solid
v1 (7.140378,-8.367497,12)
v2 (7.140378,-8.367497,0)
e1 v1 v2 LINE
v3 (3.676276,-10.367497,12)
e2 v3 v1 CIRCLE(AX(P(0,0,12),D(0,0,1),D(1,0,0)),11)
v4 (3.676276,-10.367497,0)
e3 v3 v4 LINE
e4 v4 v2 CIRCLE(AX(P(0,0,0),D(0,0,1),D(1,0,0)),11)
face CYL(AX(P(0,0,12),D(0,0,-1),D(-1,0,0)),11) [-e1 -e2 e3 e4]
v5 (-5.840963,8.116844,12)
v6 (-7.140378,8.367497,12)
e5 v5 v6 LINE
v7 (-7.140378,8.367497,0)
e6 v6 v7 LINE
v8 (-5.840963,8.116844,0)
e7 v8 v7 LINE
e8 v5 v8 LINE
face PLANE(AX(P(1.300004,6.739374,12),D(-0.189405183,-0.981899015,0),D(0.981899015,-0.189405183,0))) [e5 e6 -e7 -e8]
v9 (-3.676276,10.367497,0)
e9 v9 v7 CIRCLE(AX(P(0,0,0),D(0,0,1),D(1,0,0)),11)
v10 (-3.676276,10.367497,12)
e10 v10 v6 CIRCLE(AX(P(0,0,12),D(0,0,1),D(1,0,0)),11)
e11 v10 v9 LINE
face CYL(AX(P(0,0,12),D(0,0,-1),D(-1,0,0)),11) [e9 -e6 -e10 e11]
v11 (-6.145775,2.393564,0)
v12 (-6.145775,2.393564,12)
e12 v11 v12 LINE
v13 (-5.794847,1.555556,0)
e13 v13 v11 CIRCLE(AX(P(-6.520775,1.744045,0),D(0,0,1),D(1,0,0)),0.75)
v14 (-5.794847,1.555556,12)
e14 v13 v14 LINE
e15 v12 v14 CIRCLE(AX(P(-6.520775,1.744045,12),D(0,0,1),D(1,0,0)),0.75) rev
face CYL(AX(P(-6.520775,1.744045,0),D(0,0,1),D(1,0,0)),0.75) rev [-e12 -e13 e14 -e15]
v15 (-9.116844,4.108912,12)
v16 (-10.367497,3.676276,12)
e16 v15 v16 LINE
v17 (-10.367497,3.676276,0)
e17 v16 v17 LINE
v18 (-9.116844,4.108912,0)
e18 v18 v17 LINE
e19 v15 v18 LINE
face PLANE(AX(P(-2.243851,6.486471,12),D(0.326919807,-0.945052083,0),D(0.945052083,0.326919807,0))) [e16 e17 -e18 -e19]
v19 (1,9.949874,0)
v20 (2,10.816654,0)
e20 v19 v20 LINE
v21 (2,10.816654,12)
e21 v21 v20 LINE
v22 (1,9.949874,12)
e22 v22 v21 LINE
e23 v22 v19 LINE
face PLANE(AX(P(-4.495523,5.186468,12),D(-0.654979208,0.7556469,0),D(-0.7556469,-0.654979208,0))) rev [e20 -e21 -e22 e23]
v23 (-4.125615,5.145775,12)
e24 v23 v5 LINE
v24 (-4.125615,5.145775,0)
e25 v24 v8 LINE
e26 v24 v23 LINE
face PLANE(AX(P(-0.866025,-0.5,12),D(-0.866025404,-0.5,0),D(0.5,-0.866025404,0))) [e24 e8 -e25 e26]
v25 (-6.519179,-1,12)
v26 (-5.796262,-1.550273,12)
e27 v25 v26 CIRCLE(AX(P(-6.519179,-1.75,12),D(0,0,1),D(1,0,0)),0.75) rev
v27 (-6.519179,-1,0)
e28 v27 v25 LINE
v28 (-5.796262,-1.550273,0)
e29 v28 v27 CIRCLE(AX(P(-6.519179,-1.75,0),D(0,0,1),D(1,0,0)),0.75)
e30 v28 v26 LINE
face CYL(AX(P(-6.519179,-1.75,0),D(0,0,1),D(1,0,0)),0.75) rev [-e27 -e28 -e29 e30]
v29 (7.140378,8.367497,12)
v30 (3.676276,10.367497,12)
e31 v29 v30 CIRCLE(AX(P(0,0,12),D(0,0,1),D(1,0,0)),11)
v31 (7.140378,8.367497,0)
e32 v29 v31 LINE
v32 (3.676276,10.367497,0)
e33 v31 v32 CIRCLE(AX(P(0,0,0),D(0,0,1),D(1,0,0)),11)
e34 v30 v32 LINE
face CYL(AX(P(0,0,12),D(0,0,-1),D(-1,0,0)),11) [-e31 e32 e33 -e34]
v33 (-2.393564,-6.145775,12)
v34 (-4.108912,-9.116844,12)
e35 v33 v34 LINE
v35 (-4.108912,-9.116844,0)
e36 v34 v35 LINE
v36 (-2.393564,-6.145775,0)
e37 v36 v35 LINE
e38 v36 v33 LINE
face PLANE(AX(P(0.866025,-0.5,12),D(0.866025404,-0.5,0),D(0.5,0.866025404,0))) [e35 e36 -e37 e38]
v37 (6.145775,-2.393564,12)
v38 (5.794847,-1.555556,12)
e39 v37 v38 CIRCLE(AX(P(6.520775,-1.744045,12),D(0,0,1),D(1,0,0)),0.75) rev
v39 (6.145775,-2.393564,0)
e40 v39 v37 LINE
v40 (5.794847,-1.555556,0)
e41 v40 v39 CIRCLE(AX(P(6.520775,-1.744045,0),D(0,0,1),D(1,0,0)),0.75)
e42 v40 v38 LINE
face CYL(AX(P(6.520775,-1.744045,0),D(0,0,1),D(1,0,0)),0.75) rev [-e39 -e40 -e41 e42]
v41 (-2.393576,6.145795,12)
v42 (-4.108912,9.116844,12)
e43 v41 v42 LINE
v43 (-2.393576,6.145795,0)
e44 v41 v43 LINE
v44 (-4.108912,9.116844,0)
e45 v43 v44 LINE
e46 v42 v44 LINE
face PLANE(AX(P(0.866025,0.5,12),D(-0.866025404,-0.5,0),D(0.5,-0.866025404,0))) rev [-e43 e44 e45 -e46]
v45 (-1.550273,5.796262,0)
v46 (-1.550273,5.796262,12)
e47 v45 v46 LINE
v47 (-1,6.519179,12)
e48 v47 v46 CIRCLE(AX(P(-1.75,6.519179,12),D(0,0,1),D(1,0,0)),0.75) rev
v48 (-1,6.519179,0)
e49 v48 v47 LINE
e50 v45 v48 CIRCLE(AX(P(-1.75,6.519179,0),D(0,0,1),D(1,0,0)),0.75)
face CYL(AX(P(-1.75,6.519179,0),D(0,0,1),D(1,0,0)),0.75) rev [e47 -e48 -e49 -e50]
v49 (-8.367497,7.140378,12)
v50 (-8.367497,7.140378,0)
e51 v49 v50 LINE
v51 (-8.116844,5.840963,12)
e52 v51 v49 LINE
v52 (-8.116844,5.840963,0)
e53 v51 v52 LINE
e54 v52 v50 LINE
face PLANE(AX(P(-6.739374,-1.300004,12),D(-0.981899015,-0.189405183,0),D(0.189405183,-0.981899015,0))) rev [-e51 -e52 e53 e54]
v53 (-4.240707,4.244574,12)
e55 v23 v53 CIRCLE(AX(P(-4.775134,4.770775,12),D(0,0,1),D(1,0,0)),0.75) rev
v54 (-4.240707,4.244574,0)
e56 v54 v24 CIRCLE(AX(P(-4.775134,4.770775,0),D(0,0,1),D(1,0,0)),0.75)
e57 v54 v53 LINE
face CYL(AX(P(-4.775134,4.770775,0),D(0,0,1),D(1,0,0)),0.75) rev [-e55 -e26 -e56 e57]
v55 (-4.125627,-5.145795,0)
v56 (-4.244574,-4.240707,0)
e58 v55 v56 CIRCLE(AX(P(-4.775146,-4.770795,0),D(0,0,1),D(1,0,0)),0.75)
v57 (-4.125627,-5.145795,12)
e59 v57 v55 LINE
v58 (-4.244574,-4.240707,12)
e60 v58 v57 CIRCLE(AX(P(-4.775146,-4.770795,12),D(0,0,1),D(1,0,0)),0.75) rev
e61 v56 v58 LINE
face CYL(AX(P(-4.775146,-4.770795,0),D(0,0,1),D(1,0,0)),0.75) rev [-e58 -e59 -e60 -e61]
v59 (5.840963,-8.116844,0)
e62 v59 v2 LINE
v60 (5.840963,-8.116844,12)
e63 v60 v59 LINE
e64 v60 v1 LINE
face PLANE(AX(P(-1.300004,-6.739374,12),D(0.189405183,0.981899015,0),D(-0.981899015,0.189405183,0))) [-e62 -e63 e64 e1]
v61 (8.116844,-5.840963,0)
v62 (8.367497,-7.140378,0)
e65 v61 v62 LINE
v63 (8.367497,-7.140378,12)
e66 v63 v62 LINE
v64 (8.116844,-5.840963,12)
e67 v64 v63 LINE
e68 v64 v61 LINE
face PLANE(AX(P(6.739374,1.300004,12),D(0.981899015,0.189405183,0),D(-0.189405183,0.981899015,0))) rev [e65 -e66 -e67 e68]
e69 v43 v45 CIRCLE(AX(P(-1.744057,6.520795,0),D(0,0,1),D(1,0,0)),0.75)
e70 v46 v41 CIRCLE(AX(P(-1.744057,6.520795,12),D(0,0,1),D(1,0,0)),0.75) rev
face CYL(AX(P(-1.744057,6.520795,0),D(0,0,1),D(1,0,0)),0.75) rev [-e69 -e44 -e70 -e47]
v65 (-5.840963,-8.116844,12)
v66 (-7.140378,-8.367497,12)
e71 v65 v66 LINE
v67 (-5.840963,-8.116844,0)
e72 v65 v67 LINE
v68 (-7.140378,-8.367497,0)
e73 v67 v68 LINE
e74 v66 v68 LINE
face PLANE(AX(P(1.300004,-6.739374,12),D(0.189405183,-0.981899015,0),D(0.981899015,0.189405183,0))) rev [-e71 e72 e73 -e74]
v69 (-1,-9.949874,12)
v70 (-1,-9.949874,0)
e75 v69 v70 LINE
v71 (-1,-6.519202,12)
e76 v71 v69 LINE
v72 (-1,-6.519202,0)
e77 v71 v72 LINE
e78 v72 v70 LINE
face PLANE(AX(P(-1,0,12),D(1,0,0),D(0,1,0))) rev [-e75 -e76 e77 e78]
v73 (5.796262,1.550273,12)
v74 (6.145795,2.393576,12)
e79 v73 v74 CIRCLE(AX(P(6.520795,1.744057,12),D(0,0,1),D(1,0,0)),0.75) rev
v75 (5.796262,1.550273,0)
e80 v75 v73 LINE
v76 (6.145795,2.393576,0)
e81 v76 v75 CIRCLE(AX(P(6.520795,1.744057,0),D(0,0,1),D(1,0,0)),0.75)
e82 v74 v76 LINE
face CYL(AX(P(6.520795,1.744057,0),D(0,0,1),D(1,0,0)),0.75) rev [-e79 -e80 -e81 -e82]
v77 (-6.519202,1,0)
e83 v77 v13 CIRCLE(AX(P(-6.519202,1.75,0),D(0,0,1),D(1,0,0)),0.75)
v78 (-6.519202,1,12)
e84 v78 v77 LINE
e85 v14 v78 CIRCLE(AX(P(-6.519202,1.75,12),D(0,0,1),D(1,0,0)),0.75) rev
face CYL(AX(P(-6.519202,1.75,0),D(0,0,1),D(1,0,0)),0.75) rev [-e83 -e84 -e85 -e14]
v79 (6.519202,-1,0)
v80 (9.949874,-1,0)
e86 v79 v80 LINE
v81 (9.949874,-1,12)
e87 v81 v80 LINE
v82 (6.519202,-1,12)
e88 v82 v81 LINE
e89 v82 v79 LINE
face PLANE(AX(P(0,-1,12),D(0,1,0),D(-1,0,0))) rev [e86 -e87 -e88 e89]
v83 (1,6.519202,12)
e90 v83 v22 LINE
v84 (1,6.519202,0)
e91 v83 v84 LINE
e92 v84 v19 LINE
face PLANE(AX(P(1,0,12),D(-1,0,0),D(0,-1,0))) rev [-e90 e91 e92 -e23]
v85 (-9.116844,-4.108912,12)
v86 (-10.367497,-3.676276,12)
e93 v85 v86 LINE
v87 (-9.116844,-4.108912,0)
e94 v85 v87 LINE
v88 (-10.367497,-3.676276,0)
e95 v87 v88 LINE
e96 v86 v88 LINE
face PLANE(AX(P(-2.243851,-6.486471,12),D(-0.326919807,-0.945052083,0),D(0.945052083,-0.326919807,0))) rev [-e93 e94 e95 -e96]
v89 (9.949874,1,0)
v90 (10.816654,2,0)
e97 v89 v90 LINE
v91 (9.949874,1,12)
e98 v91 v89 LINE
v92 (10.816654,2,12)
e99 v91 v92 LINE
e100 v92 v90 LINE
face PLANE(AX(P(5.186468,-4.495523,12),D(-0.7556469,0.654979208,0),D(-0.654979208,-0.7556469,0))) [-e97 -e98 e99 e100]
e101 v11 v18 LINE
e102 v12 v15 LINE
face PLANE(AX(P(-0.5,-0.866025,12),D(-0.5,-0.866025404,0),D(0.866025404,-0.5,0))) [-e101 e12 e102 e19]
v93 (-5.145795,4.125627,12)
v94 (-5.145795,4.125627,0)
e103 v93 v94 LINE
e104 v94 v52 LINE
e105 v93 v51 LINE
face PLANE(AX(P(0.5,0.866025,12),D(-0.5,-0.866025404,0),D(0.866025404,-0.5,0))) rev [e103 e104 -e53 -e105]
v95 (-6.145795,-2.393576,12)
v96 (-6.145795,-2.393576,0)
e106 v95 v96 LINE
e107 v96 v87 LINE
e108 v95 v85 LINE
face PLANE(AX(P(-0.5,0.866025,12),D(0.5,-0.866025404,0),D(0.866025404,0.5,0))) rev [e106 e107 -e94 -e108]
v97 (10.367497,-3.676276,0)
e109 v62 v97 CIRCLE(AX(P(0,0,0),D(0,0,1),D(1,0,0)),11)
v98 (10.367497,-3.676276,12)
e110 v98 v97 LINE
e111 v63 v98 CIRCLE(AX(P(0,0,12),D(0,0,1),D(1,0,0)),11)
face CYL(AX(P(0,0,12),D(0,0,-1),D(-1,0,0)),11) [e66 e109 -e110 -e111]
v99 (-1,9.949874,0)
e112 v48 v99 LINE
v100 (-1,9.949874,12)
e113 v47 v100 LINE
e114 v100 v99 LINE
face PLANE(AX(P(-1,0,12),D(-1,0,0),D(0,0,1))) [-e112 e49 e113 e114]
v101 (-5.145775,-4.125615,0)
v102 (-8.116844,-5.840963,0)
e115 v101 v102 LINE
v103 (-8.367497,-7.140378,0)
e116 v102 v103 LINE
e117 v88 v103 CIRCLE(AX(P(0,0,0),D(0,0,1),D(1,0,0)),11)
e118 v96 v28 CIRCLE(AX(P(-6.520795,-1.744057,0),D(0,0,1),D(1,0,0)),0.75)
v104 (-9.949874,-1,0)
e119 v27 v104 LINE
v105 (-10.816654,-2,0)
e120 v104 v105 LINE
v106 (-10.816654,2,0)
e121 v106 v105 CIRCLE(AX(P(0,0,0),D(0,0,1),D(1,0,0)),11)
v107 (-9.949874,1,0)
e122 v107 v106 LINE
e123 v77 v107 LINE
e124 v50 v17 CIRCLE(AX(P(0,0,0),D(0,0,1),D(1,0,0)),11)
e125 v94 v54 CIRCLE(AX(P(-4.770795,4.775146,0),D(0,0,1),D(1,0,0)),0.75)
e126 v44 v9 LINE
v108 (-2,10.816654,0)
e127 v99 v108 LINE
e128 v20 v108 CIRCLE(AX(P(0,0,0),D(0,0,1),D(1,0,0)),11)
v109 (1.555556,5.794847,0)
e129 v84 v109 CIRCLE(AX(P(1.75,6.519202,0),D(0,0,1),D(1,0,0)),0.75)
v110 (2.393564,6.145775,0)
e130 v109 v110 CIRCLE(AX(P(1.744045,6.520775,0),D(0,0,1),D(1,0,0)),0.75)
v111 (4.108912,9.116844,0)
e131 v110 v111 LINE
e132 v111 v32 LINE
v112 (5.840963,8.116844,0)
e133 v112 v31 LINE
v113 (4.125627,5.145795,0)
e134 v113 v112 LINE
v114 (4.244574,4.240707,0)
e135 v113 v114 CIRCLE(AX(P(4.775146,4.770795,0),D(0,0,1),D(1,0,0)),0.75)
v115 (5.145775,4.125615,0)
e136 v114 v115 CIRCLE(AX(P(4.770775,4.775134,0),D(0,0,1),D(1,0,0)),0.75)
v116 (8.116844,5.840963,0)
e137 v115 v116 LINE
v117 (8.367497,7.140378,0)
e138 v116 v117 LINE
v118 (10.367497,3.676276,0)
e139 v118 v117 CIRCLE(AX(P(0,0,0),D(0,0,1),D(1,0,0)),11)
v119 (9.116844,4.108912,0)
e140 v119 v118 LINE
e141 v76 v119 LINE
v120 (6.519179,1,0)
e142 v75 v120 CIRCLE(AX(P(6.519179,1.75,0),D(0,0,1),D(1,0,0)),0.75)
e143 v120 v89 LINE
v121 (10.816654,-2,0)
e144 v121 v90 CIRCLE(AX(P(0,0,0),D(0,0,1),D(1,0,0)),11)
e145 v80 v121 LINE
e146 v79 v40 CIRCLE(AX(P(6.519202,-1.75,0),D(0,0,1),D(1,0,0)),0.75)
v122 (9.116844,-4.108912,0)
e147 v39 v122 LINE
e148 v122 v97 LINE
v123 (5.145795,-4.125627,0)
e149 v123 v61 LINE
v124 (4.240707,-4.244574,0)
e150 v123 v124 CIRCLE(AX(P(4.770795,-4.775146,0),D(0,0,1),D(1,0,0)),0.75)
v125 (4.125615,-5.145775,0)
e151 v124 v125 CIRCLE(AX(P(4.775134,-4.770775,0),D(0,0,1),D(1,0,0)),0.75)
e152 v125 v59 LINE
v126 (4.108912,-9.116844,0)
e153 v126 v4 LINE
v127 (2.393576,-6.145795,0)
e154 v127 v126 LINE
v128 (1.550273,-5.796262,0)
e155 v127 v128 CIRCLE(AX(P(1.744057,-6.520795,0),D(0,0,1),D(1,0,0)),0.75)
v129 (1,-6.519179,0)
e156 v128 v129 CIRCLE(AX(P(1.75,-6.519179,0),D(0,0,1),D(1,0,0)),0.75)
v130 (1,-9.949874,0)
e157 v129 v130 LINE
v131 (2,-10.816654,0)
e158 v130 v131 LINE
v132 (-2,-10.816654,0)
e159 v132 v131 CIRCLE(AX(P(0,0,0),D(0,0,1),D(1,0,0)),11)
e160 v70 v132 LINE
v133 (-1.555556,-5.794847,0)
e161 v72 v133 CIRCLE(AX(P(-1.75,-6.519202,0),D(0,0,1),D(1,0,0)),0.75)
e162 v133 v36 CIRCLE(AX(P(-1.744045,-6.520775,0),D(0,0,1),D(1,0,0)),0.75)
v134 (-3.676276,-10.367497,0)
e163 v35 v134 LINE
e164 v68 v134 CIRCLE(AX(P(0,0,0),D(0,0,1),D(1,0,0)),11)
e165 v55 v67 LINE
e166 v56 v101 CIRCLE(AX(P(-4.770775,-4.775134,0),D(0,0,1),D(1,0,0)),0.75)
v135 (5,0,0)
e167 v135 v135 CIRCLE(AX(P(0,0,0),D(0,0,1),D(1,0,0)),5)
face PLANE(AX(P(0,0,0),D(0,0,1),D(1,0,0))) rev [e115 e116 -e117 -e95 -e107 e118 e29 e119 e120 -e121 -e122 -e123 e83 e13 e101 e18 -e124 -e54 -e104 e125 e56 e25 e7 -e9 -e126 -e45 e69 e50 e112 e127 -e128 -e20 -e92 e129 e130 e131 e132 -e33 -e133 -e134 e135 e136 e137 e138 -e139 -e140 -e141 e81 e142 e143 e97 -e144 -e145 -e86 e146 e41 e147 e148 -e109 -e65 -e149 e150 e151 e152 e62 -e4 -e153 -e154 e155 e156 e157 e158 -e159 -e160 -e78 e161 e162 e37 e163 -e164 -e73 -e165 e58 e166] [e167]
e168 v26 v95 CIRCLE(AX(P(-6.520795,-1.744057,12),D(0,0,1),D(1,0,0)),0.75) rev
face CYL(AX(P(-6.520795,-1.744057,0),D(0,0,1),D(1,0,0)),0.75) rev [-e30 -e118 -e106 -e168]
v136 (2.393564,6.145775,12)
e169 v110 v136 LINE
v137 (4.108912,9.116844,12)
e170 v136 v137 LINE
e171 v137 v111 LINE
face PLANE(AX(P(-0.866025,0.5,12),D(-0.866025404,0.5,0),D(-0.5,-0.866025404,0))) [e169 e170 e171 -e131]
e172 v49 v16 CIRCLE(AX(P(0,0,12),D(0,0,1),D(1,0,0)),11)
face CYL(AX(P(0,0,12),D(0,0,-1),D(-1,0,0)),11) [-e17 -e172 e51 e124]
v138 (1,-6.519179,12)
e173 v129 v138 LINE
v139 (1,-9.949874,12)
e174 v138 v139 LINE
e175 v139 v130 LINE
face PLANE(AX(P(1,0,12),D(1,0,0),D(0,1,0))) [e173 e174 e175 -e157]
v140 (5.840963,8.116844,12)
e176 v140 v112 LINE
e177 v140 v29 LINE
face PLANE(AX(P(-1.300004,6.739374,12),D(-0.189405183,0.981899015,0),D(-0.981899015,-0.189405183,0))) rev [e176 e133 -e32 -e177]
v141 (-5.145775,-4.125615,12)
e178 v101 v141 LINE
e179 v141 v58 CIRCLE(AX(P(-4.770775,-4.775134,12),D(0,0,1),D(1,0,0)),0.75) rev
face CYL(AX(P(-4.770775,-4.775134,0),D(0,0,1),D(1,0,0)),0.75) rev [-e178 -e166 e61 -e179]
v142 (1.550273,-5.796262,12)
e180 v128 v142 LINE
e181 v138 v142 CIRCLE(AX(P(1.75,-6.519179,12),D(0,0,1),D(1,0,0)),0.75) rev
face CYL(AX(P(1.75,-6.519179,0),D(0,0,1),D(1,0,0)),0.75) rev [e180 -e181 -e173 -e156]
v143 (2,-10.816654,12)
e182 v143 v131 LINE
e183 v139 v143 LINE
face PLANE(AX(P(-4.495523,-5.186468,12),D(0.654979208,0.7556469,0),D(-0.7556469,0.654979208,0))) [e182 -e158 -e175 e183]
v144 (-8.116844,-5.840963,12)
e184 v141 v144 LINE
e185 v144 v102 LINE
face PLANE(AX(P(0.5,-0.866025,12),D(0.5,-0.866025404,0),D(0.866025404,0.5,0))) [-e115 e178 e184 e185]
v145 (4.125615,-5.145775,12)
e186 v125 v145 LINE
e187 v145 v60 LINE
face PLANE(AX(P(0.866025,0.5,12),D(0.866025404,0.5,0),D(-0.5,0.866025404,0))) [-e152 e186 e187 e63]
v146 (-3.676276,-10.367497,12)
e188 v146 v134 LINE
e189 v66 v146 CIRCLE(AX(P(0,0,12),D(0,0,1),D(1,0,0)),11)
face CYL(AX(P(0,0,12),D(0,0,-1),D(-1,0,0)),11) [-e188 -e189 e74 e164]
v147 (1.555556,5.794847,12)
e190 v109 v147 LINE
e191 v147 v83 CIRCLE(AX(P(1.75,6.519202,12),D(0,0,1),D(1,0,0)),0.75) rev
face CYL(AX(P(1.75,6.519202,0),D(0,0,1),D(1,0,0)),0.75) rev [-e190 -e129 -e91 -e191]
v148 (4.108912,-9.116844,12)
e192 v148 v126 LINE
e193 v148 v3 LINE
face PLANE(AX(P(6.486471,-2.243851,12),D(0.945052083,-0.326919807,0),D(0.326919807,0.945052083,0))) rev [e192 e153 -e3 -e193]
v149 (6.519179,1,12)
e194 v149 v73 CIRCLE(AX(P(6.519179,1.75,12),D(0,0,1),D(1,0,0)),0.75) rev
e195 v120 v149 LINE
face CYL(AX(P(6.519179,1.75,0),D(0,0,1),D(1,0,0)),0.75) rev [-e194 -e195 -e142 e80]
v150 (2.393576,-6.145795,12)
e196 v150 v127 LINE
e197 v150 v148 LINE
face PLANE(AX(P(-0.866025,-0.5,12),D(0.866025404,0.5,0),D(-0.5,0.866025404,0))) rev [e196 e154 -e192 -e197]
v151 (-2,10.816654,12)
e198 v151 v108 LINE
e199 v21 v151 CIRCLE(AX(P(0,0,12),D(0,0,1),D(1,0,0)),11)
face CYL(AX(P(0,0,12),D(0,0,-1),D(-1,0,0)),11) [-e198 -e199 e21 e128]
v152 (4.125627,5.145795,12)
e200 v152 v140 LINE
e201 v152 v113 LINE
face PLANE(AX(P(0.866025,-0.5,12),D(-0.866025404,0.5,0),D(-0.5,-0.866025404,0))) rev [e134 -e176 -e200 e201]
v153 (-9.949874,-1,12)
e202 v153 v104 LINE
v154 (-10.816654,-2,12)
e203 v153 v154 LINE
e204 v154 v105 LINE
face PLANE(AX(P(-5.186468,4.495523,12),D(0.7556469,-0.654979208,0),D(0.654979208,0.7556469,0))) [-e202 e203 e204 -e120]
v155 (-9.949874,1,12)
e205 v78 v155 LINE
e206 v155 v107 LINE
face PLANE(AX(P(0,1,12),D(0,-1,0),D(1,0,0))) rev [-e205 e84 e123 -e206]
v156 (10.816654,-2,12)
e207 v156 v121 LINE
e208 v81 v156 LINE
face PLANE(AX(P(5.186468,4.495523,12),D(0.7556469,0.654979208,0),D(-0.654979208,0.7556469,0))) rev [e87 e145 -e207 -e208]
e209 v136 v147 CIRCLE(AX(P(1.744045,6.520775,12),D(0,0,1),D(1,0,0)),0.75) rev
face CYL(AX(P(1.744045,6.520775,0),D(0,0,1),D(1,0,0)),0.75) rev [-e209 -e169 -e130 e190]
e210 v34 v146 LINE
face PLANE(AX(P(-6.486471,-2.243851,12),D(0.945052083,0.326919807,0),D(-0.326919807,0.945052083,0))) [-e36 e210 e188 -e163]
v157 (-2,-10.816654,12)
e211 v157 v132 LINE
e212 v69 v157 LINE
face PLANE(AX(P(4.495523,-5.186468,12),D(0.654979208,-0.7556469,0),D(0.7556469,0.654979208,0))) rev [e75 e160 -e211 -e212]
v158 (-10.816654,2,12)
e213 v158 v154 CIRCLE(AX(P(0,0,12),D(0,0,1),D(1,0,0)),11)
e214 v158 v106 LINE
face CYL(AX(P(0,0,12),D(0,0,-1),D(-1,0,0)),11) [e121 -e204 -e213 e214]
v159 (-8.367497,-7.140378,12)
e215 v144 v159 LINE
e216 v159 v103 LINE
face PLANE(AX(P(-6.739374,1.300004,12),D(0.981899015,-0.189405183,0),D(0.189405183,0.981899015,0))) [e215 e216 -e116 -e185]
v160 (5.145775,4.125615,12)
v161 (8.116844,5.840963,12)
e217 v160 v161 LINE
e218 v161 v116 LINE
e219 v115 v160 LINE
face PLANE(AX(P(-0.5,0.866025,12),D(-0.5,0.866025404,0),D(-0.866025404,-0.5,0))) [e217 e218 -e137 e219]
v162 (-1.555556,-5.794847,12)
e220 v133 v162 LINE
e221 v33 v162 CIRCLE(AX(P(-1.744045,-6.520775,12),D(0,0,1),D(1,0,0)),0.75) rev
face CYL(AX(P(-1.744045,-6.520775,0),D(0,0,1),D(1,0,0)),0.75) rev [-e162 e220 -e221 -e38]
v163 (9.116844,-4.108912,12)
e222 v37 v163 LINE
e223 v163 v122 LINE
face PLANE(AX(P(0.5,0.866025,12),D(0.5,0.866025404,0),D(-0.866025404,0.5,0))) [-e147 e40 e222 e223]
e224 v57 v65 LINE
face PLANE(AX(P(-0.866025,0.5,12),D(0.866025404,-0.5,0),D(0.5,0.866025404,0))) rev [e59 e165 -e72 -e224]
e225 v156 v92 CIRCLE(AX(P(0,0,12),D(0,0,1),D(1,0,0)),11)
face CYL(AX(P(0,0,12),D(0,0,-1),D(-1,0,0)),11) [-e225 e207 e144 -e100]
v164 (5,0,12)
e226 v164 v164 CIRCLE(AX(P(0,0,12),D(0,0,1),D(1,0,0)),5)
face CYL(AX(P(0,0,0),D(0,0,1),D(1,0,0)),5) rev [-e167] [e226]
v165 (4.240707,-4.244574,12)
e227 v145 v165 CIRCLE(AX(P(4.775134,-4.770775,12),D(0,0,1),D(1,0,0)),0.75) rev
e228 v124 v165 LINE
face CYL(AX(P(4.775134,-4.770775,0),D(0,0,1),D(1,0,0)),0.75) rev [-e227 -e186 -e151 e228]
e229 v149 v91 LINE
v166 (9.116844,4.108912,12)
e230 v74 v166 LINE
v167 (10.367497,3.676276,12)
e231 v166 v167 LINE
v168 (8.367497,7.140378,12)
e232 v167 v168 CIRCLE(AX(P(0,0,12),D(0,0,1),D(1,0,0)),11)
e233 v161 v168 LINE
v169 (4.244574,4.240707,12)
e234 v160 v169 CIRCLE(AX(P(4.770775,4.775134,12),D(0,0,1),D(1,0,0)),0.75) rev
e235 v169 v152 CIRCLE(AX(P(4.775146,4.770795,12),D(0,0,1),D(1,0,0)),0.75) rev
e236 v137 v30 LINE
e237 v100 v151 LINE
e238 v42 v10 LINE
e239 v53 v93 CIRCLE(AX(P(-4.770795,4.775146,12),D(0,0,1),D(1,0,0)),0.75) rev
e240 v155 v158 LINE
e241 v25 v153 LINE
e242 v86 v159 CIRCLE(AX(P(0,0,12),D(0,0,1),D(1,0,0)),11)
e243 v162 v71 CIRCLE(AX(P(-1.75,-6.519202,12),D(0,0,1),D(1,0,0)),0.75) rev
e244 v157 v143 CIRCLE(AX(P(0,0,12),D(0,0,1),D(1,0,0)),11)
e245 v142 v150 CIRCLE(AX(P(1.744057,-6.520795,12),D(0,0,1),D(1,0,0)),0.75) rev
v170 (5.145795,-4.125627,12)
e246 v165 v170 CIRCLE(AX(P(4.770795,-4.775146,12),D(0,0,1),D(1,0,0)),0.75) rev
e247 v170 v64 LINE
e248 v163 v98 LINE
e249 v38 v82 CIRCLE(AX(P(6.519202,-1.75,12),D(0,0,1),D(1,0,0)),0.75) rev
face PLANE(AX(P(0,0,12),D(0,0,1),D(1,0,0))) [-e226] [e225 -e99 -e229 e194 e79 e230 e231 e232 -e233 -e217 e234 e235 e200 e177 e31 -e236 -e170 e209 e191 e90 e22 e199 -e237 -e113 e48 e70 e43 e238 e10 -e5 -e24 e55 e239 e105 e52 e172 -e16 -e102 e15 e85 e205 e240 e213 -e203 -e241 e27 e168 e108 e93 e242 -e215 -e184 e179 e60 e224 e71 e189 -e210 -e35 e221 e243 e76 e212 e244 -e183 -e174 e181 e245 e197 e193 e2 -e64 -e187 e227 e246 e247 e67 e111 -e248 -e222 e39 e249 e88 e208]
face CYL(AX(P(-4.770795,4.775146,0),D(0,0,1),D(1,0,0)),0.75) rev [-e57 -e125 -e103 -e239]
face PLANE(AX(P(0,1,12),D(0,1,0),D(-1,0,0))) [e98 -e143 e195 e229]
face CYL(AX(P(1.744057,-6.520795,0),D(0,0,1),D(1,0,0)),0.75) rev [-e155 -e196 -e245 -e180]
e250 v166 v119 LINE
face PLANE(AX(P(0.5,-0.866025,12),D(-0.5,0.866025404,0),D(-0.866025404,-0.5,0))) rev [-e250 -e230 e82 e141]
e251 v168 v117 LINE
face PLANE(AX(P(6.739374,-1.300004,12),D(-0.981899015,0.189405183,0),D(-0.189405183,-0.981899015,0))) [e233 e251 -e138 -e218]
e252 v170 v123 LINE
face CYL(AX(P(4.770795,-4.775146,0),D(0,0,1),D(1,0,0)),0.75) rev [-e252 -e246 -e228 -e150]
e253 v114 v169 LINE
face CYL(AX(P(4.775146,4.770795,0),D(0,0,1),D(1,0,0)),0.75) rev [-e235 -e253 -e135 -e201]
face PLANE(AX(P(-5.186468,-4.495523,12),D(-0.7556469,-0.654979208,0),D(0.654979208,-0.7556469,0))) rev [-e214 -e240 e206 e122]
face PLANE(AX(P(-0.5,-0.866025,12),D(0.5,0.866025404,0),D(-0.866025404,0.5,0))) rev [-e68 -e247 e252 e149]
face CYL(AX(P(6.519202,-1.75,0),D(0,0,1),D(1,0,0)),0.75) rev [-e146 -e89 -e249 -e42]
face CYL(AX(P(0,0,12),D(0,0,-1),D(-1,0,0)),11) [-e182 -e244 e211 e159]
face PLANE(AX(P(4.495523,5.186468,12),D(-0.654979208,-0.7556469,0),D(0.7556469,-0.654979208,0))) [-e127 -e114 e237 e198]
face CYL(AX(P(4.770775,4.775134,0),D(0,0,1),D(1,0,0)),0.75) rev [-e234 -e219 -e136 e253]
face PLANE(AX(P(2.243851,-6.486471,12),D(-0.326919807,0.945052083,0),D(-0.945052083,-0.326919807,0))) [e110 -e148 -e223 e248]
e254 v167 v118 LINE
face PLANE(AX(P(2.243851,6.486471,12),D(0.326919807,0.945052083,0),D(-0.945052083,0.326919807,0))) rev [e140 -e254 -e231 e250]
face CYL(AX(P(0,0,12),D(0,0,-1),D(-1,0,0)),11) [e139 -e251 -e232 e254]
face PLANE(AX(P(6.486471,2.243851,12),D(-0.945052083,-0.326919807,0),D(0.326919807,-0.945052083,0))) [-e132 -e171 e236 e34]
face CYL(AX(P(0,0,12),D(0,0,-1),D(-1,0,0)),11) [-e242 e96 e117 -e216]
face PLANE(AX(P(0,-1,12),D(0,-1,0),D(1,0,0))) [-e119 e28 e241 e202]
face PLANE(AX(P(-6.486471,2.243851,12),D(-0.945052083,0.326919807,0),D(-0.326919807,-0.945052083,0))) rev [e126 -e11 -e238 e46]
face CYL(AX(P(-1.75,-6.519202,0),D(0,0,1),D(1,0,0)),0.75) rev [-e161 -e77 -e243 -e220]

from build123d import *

# Parameters (mm, degrees)
BOSS_EXTRUDE1_DEPTH = 12
SKETCH2_R           = 6
BOSS_EXTRUDE2_DEPTH = 12
SKETCH3_R           = 5
CUT_EXTRUDE1_DEPTH  = 12
FILLET1_R           = 0.75
FILLET2_R           = 0.75
FILLET3_R           = 0.75
FILLET4_R           = 0.75


with BuildPart() as part:
    # Sketch1 → Boss-Extrude1 (new body)
    with BuildSketch(Plane.XY):
        with BuildLine():
            Line((-1, 9.949874371), (-2, 10.816653826))
            ThreePointArc((-2, 10.816653826), (0, 11), (2, 10.816653826))
            Line((2, 10.816653826), (1, 9.949874371))
            Line((1, 9.949874371), (1, 4.898979486))
            ThreePointArc((1, 4.898979486), (1.294095226, 4.829629131), (1.583464339, 4.742640687))
            Line((1.583464339, 4.742640687), (4.108911782, 9.11684397))
            Line((4.108911782, 9.11684397), (3.676276106, 10.367496998))
            ThreePointArc((3.676276106, 10.367496998), (5.5, 9.526279442), (7.140377721, 8.367496998))
            Line((7.140377721, 8.367496998), (5.840962589, 8.11684397))
            Line((5.840962589, 8.11684397), (3.315515147, 3.742640687))
            ThreePointArc((3.315515147, 3.742640687), (3.535533906, 3.535533906), (3.742640687, 3.315515147))
            Line((3.742640687, 3.315515147), (8.11684397, 5.840962589))
            Line((8.11684397, 5.840962589), (8.367496998, 7.140377721))
            ThreePointArc((8.367496998, 7.140377721), (9.526279442, 5.5), (10.367496998, 3.676276106))
            Line((10.367496998, 3.676276106), (9.11684397, 4.108911782))
            Line((9.11684397, 4.108911782), (4.742640687, 1.583464339))
            ThreePointArc((4.742640687, 1.583464339), (4.829629131, 1.294095226), (4.898979486, 1))
            Line((4.898979486, 1), (9.949874371, 1))
            Line((9.949874371, 1), (10.816653826, 2))
            ThreePointArc((10.816653826, 2), (11, 0), (10.816653826, -2))
            Line((10.816653826, -2), (9.949874371, -1))
            Line((9.949874371, -1), (4.898979486, -1))
            ThreePointArc((4.898979486, -1), (4.829629131, -1.294095226), (4.742640687, -1.583464339))
            Line((4.742640687, -1.583464339), (9.11684397, -4.108911782))
            Line((9.11684397, -4.108911782), (10.367496998, -3.676276106))
            ThreePointArc((10.367496998, -3.676276106), (9.526279442, -5.5), (8.367496998, -7.140377721))
            Line((8.367496998, -7.140377721), (8.11684397, -5.840962589))
            Line((8.11684397, -5.840962589), (3.742640687, -3.315515147))
            ThreePointArc((3.742640687, -3.315515147), (3.535533906, -3.535533906), (3.315515147, -3.742640687))
            Line((3.315515147, -3.742640687), (5.840962589, -8.11684397))
            Line((5.840962589, -8.11684397), (7.140377721, -8.367496998))
            ThreePointArc((7.140377721, -8.367496998), (5.5, -9.526279442), (3.676276106, -10.367496998))
            Line((3.676276106, -10.367496998), (4.108911782, -9.11684397))
            Line((4.108911782, -9.11684397), (1.583464339, -4.742640687))
            ThreePointArc((1.583464339, -4.742640687), (1.294095226, -4.829629131), (1, -4.898979486))
            Line((1, -4.898979486), (1, -9.949874371))
            Line((1, -9.949874371), (2, -10.816653826))
            ThreePointArc((2, -10.816653826), (0, -11), (-2, -10.816653826))
            Line((-2, -10.816653826), (-1, -9.949874371))
            Line((-1, -9.949874371), (-1, -4.898979486))
            ThreePointArc((-1, -4.898979486), (-1.294095226, -4.829629131), (-1.583464339, -4.742640687))
            Line((-1.583464339, -4.742640687), (-4.108911782, -9.11684397))
            Line((-4.108911782, -9.11684397), (-3.676276106, -10.367496998))
            ThreePointArc((-3.676276106, -10.367496998), (-5.5, -9.526279442), (-7.140377721, -8.367496998))
            Line((-7.140377721, -8.367496998), (-5.840962589, -8.11684397))
            Line((-5.840962589, -8.11684397), (-3.315515147, -3.742640687))
            ThreePointArc((-3.315515147, -3.742640687), (-3.535533906, -3.535533906), (-3.742640687, -3.315515147))
            Line((-3.742640687, -3.315515147), (-8.11684397, -5.840962589))
            Line((-8.11684397, -5.840962589), (-8.367496998, -7.140377721))
            ThreePointArc((-8.367496998, -7.140377721), (-9.526279442, -5.5), (-10.367496998, -3.676276106))
            Line((-10.367496998, -3.676276106), (-9.11684397, -4.108911782))
            Line((-9.11684397, -4.108911782), (-4.742640687, -1.583464339))
            ThreePointArc((-4.742640687, -1.583464339), (-4.829629131, -1.294095226), (-4.898979486, -1))
            Line((-4.898979486, -1), (-9.949874371, -1))
            Line((-9.949874371, -1), (-10.816653826, -2))
            ThreePointArc((-10.816653826, -2), (-11, 0), (-10.816653826, 2))
            Line((-10.816653826, 2), (-9.949874371, 1))
            Line((-9.949874371, 1), (-4.898979486, 1))
            ThreePointArc((-4.898979486, 1), (-4.829629131, 1.294095226), (-4.742640687, 1.583464339))
            Line((-4.742640687, 1.583464339), (-9.11684397, 4.108911782))
            Line((-9.11684397, 4.108911782), (-10.367496998, 3.676276106))
            ThreePointArc((-10.367496998, 3.676276106), (-9.526279442, 5.5), (-8.367496998, 7.140377721))
            Line((-8.367496998, 7.140377721), (-8.11684397, 5.840962589))
            Line((-8.11684397, 5.840962589), (-3.742640687, 3.315515147))
            ThreePointArc((-3.742640687, 3.315515147), (-3.535533906, 3.535533906), (-3.315515147, 3.742640687))
            Line((-3.315515147, 3.742640687), (-5.840962589, 8.11684397))
            Line((-5.840962589, 8.11684397), (-7.140377721, 8.367496998))
            ThreePointArc((-7.140377721, 8.367496998), (-5.5, 9.526279442), (-3.676276106, 10.367496998))
            Line((-3.676276106, 10.367496998), (-4.108911782, 9.11684397))
            Line((-4.108911782, 9.11684397), (-1.583464339, 4.742640687))
            ThreePointArc((-1.583464339, 4.742640687), (-1.294095226, 4.829629131), (-1, 4.898979486))
            Line((-1, 4.898979486), (-1, 9.949874371))
        make_face()
    extrude(amount=BOSS_EXTRUDE1_DEPTH)

    # Sketch2 → Boss-Extrude2 (add)
    with BuildSketch(Plane.XY.offset(12)):
        Circle(SKETCH2_R)
    extrude(amount=-BOSS_EXTRUDE2_DEPTH)

    # Sketch3 → Cut-Extrude1 (cut)
    with BuildSketch(Plane.XY.offset(12)):
        Circle(SKETCH3_R)
    extrude(amount=-CUT_EXTRUDE1_DEPTH, mode=Mode.SUBTRACT)

    # Fillet1
    fillet1_edges = [part.edges().sort_by_distance(p)[0] for p in [
        (-4.623475383, 3.824065295, 6),
    ]]
    fillet(fillet1_edges, radius=FILLET1_R)

    # Fillet2
    # the kernel refuses this fillet: 0.75 mm, written as the material it adds along each edge
    with BuildSketch(Plane(origin=(-3.824065295, 4.623475383, 0), x_dir=(-0.7395125518358552, -0.6731427676780178, 0), z_dir=(0, 0, 1))) as fillet2_piece_1:
        with BuildLine():
            CenterArc((0.604168803, -0.749157497), FILLET2_R, 92.716022766, 74.973886241)
            Line((-0.128587227, -0.589255651), (0, 0))
            ThreePointArc((0, 0), (0.284314731, -0.006740024), (0.568629461, 0))
        make_face()
    extrude(amount=12)

    # Fillet3
    fillet3_edges = [part.edges().sort_by_distance(p)[0] for p in [
        (3.824065295, 4.623475383, 6),
        (1, 5.916079783, 6),
        (-2.092014488, 5.623475383, 6),
        (-5.916079783, 1, 6),
        (-5.623475383, -2.092014488, 6),
        (-3.824065295, -4.623475383, 6),
        (-1, -5.916079783, 6),
        (2.092014488, -5.623475383, 6),
        (4.623475383, -3.824065295, 6),
        (5.916079783, -1, 6),
        (5.623475383, 2.092014488, 6),
    ]]
    fillet(fillet3_edges, radius=FILLET3_R)

    # Fillet4
    # the kernel refuses this fillet: 0.75 mm, written as the material it adds along each edge
    with BuildSketch(Plane(origin=(-5.916079783, -1, 0), x_dir=(-1, 0, 0), z_dir=(0, 0, 1)), Plane(origin=(-4.623475383, -3.824065295, 0), x_dir=(-0.8660254037844433, -0.4999999999999918, 0), z_dir=(0, 0, 1)), Plane(origin=(-2.092014488, -5.623475383, 0), x_dir=(-0.5000000000000068, -0.8660254037844348, 0), z_dir=(0, 0, 1)), Plane(origin=(1, -5.916079783, 0), x_dir=(0, -1, 0), z_dir=(0, 0, 1)), Plane(origin=(-5.623475383, 2.092014488, 0), x_dir=(-0.8660254037844328, 0.5000000000000101, 0), z_dir=(0, 0, 1))) as fillet4_piece_1:
        with BuildLine():
            CenterArc((0.603099347, 0.75), FILLET4_R, 195.444398539, 74.555601461)
            Line((-0.119817654, 0.550272663), (-0.134275994, 0.546278116))
            ThreePointArc((-0.134275994, 0.546278116), (-0.068105699, 0.273351526), (-0.014790199, -0.0025))
            Line((-0.014790199, -0.0025), (0, -0.015))
            Line((0, -0.015), (0.603099347, -0.015))
            Line((0.603099347, -0.015), (0.603099347, 0))
        make_face()
    extrude(amount=12)
    with BuildSketch(Plane(origin=(3.824065295, -4.623475383, 0), x_dir=(0.7398192740207736, 0.6728056493426431, 0), z_dir=(0, 0, 1)), Plane(origin=(5.623475383, -2.092014488, 0), x_dir=(0.30429946084002696, 0.9525764211508013, 0), z_dir=(0, 0, 1)), Plane(origin=(5.916079783, 1, 0), x_dir=(-0.21275714713002825, 0.9771051101826719, 0), z_dir=(0, 0, 1)), Plane(origin=(4.623475383, 3.824065295, 0), x_dir=(-0.6728056493426434, 0.7398192740207732, 0), z_dir=(0, 0, 1)), Plane(origin=(2.092014488, 5.623475383, 0), x_dir=(-0.9525764211508011, 0.30429946084002774, 0), z_dir=(0, 0, 1)), Plane(origin=(-1, 5.916079783, 0), x_dir=(-0.9771051101826725, -0.21275714713002564, 0), z_dir=(0, 0, 1))) as fillet4_piece_2:
        with BuildLine():
            CenterArc((0.604515136, -0.748859315), FILLET4_R, 93.160421305, 74.555601461)
            Line((-0.128313697, -0.589291454), (-0.142970273, -0.586100097))
            Line((-0.142970273, -0.586100097), (-0.014656577, 0.003191357))
            Line((-0.014656577, 0.003191357), (0.000703958, 0.014983472))
            ThreePointArc((0.000703958, 0.014983472), (0.281583147, 0.008388935), (0.562339316, 0.014977186))
            Line((0.562339316, 0.014977186), (0.563166293, 0))
        make_face()
    extrude(amount=12)


solid = part.part
